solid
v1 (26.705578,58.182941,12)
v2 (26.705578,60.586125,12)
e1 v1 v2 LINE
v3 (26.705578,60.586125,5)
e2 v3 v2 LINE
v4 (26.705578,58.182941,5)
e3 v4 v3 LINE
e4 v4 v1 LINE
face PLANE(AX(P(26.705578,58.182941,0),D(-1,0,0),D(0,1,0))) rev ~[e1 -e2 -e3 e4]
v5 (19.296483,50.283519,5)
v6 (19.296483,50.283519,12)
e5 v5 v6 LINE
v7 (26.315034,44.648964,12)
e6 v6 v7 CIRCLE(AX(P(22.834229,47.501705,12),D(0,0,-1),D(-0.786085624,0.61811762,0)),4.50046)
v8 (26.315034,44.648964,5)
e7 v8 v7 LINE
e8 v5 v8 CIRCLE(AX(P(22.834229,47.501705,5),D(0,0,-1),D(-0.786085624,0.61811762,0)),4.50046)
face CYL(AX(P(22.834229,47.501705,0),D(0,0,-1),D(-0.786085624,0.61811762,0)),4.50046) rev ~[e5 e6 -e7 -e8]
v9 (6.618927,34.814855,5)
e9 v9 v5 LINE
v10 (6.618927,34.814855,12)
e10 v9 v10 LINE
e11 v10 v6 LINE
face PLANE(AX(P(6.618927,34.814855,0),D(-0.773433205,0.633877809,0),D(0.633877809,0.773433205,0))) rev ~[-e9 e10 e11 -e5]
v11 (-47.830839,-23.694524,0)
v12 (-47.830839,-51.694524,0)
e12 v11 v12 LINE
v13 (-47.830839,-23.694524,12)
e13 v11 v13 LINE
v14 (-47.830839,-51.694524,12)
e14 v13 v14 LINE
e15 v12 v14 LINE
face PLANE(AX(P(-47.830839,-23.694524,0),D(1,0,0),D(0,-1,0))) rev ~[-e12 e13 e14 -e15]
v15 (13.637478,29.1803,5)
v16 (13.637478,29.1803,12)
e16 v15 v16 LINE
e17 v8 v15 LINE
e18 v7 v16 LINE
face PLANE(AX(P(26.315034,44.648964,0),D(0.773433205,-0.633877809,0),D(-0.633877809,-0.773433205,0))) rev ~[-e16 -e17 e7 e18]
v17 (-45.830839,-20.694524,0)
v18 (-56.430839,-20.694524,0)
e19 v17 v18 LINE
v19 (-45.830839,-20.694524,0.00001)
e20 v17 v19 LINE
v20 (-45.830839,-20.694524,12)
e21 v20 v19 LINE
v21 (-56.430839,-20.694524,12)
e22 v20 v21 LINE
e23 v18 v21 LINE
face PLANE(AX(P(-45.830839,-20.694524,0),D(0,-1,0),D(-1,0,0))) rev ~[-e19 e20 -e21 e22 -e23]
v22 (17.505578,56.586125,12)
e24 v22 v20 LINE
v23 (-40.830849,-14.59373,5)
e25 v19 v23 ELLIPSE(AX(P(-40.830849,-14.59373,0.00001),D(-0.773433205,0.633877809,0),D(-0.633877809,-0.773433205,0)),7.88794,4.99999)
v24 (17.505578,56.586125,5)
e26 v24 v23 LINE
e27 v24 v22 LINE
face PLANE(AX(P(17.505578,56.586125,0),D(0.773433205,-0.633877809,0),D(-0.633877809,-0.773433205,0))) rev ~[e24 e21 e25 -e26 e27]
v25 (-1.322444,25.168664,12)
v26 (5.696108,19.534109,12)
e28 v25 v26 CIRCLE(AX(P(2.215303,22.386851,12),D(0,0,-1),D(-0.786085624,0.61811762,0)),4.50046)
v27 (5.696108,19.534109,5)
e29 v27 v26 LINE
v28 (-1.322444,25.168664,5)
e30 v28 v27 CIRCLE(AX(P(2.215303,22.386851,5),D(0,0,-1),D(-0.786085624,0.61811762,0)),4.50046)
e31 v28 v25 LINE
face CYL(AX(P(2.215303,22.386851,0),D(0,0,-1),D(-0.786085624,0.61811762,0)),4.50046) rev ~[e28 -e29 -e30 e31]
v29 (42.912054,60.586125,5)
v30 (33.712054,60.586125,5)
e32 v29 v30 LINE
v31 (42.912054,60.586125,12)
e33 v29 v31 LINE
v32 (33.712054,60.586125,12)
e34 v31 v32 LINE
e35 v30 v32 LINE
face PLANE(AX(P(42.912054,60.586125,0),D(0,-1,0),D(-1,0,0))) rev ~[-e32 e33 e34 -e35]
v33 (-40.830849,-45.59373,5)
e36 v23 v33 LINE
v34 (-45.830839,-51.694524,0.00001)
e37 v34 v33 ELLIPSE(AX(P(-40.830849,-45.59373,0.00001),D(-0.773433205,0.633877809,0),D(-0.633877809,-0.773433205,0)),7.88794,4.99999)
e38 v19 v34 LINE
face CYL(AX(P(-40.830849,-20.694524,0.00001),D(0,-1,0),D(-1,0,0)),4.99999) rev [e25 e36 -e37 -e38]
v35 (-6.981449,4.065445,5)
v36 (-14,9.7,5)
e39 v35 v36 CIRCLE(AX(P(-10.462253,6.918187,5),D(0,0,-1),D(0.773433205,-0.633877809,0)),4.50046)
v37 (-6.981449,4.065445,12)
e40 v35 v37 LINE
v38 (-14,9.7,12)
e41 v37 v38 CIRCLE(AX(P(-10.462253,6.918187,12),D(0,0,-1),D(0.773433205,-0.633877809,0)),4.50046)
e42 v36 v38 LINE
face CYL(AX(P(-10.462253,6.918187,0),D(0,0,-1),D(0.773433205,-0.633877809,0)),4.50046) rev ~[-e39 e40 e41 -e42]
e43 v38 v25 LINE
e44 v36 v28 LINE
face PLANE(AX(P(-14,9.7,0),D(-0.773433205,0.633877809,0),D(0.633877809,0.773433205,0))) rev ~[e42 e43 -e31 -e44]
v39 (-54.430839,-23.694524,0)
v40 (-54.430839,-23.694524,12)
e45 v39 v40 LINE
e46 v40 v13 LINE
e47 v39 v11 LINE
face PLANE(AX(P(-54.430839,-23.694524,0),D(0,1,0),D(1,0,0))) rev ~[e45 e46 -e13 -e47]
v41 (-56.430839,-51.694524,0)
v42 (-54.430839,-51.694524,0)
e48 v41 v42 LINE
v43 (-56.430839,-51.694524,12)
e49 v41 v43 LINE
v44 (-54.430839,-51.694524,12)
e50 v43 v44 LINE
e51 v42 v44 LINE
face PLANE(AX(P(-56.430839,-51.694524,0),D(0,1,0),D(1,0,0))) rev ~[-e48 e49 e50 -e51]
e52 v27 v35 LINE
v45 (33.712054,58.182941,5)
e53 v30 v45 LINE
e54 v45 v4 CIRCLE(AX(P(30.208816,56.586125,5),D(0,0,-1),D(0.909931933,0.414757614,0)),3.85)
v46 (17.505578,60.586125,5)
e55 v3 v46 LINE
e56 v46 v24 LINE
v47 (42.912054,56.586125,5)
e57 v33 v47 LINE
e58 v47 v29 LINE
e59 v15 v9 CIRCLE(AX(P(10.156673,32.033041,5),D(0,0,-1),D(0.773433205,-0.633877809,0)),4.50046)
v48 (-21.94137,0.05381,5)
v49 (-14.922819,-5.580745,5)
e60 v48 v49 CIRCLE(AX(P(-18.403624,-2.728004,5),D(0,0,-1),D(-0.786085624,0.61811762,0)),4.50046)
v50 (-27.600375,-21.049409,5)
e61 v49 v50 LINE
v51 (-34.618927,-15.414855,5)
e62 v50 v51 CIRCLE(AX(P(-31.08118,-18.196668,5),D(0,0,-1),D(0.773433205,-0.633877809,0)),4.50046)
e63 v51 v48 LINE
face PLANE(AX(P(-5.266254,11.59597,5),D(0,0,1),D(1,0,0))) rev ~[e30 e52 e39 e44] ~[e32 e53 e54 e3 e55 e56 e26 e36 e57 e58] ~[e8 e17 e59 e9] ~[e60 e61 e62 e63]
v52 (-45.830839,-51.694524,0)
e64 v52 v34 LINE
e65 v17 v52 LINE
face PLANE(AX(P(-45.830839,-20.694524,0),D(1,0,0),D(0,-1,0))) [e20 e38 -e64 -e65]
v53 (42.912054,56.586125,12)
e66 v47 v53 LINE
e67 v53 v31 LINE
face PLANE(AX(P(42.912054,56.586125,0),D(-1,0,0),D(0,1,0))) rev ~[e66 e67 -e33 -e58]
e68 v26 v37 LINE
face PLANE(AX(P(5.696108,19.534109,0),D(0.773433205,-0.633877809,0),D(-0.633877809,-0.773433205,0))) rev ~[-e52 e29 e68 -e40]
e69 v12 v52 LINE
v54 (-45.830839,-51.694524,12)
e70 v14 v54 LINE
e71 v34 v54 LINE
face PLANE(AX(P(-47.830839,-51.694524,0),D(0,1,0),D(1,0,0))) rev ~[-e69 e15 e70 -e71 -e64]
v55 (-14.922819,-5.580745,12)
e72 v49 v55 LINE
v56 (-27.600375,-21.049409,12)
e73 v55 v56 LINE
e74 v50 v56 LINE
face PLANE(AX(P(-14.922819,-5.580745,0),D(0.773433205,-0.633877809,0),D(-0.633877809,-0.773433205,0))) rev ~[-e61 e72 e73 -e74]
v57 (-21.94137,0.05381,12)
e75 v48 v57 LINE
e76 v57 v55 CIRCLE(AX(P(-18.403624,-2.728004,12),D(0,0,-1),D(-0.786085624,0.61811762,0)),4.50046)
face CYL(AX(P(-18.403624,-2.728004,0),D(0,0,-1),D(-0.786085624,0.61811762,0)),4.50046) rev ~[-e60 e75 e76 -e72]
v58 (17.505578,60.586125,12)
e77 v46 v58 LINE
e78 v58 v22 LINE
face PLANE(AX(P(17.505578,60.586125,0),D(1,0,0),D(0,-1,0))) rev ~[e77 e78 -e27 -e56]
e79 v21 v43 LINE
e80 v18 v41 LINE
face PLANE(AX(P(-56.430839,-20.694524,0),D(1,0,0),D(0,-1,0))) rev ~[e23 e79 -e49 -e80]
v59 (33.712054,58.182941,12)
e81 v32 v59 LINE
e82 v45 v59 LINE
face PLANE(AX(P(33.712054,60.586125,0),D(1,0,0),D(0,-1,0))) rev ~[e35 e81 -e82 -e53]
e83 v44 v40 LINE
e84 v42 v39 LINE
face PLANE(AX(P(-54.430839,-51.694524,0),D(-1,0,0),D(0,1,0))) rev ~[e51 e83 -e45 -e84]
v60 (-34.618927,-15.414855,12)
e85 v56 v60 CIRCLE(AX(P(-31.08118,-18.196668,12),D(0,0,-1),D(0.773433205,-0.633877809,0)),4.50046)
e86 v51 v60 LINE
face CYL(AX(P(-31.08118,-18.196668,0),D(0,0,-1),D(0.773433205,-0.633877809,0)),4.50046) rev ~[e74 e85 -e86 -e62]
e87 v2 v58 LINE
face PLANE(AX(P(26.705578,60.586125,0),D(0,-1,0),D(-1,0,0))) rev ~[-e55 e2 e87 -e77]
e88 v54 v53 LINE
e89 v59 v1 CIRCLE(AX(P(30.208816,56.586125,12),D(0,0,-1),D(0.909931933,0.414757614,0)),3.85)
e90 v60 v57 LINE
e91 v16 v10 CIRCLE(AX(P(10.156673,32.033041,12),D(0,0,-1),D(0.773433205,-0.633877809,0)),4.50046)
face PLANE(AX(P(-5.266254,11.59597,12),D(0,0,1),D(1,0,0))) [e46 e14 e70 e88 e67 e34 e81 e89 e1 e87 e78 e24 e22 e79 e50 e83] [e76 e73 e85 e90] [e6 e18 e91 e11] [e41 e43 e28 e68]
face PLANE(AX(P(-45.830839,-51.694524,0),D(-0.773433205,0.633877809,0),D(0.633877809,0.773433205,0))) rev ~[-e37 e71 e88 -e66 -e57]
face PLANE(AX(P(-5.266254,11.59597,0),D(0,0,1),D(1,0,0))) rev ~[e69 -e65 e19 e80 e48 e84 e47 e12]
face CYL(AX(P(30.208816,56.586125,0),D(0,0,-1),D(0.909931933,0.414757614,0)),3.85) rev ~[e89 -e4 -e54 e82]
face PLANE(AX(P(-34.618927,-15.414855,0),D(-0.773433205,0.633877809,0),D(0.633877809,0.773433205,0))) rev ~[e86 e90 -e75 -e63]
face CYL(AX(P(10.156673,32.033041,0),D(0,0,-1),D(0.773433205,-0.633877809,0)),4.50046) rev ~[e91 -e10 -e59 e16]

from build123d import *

# Parameters (mm, degrees)
F1_DEPTH = 12
F2_DEPTH = 25
F3_DEPTH = 5
F4_R     = 4.99999


# Not quite as in the source:
# - a fillet or chamfer is up to 0.001 mm smaller than in the source, because OpenCascade refuses the exact size


with BuildPart() as f1:
    # F0 (on Top) → F1 (new body)
    with BuildSketch(Plane.XY):
        with BuildLine():
            Line((-45.8308390021, -20.6945241443), (-45.8308390021, -51.6945241443))
            Line((-45.8308390021, -51.6945241443), (42.9120542584, 56.586124615))
            Line((42.9120542584, 56.586124615), (42.9120542584, 60.586124615))
            Line((42.9120542584, 60.586124615), (33.7120542584, 60.586124615))
            Line((33.7120542584, 60.586124615), (33.7120542584, 58.1829414275))
            ThreePointArc((33.7120542584, 58.1829414275), (30.2088163179, 52.736124615), (26.7055783775, 58.1829414275))
            Line((26.7055783775, 58.1829414275), (26.7055783775, 60.586124615))
            Line((26.7055783775, 60.586124615), (17.5055783775, 60.586124615))
            Line((17.5055783775, 60.586124615), (17.5055783775, 56.586124615))
            Line((17.5055783775, 56.586124615), (-45.8308390021, -20.6945241443))
        make_face()
        with BuildLine():
            ThreePointArc((-27.6003750582, -21.0494093167), (-33.898601194, -21.7061227773), (-34.6189265027, -15.4148545048))
            Line((-34.6189265027, -15.4148545048), (-21.9413703226, 0.0538096037))
            ThreePointArc((-21.9413703226, 0.0538096037), (-15.5862024886, 0.7814511592), (-14.9228188782, -5.5807452082))
            Line((-14.9228188782, -5.5807452082), (-27.6003750582, -21.0494093167))
        make_face(mode=Mode.SUBTRACT)
        with BuildLine():
            ThreePointArc((-6.9814485555, 4.0654451881), (-13.2796746913, 3.4087317275), (-14, 9.7))
            Line((-14, 9.7), (-1.3224438199, 25.1686641085))
            ThreePointArc((-1.3224438199, 25.1686641085), (5.0327240141, 25.896305664), (5.6961076246, 19.5341092966))
            Line((5.6961076246, 19.5341092966), (-6.9814485555, 4.0654451881))
        make_face(mode=Mode.SUBTRACT)
        with BuildLine():
            ThreePointArc((13.6374779472, 29.1802996929), (7.3392518114, 28.5235862323), (6.6189265027, 34.8148545048))
            Line((6.6189265027, 34.8148545048), (19.2964826828, 50.2835186133))
            ThreePointArc((19.2964826828, 50.2835186133), (25.6516505168, 51.0111601688), (26.3150341273, 44.6489638014))
            Line((26.3150341273, 44.6489638014), (13.6374779472, 29.1802996929))
        make_face(mode=Mode.SUBTRACT)
        Polygon((-54.4308390021, -51.6945241443), (-54.4308390021, -23.6945241443), (-47.8308390021, -23.6945241443), (-47.8308390021, -51.6945241443), (-45.8308390021, -51.6945241443), (-45.8308390021, -20.6945241443), (-56.4308390021, -20.6945241443), (-56.4308390021, -51.6945241443), align=None)
    extrude(amount=F1_DEPTH)

    # F0 (on Top) → F2 (cut)
    with BuildSketch(Plane.XY):
        with BuildLine():
            Line((-21.9413703226, 0.0538096037), (-34.6189265027, -15.4148545048))
            ThreePointArc((-34.6189265027, -15.4148545048), (-33.898601194, -21.7061227773), (-27.6003750582, -21.0494093167))
            Line((-27.6003750582, -21.0494093167), (-14.9228188782, -5.5807452082))
            ThreePointArc((-14.9228188782, -5.5807452082), (-15.5862024886, 0.7814511592), (-21.9413703226, 0.0538096037))
        make_face()
        with BuildLine():
            Line((-1.3224438199, 25.1686641085), (-14, 9.7))
            ThreePointArc((-14, 9.7), (-13.2796746913, 3.4087317275), (-6.9814485555, 4.0654451881))
            Line((-6.9814485555, 4.0654451881), (5.6961076246, 19.5341092966))
            ThreePointArc((5.6961076246, 19.5341092966), (5.0327240141, 25.896305664), (-1.3224438199, 25.1686641085))
        make_face()
        with BuildLine():
            Line((19.2964826828, 50.2835186133), (6.6189265027, 34.8148545048))
            ThreePointArc((6.6189265027, 34.8148545048), (7.3392518114, 28.5235862323), (13.6374779472, 29.1802996929))
            Line((13.6374779472, 29.1802996929), (26.3150341273, 44.6489638014))
            ThreePointArc((26.3150341273, 44.6489638014), (25.6516505168, 51.0111601688), (19.2964826828, 50.2835186133))
        make_face()
    extrude(amount=-F2_DEPTH, mode=Mode.SUBTRACT)

    # F0 (on Top) → F3 (cut)
    with BuildSketch(Plane.XY):
        with BuildLine():
            Line((-45.8308390021, -20.6945241443), (-45.8308390021, -51.6945241443))
            Line((-45.8308390021, -51.6945241443), (42.9120542584, 56.586124615))
            Line((42.9120542584, 56.586124615), (42.9120542584, 60.586124615))
            Line((42.9120542584, 60.586124615), (33.7120542584, 60.586124615))
            Line((33.7120542584, 60.586124615), (33.7120542584, 58.1829414275))
            ThreePointArc((33.7120542584, 58.1829414275), (30.2088163179, 52.736124615), (26.7055783775, 58.1829414275))
            Line((26.7055783775, 58.1829414275), (26.7055783775, 60.586124615))
            Line((26.7055783775, 60.586124615), (17.5055783775, 60.586124615))
            Line((17.5055783775, 60.586124615), (17.5055783775, 56.586124615))
            Line((17.5055783775, 56.586124615), (-45.8308390021, -20.6945241443))
        make_face()
        with BuildLine():
            ThreePointArc((-27.6003750582, -21.0494093167), (-33.898601194, -21.7061227773), (-34.6189265027, -15.4148545048))
            Line((-34.6189265027, -15.4148545048), (-21.9413703226, 0.0538096037))
            ThreePointArc((-21.9413703226, 0.0538096037), (-15.5862024886, 0.7814511592), (-14.9228188782, -5.5807452082))
            Line((-14.9228188782, -5.5807452082), (-27.6003750582, -21.0494093167))
        make_face(mode=Mode.SUBTRACT)
        with BuildLine():
            ThreePointArc((-6.9814485555, 4.0654451881), (-13.2796746913, 3.4087317275), (-14, 9.7))
            Line((-14, 9.7), (-1.3224438199, 25.1686641085))
            ThreePointArc((-1.3224438199, 25.1686641085), (5.0327240141, 25.896305664), (5.6961076246, 19.5341092966))
            Line((5.6961076246, 19.5341092966), (-6.9814485555, 4.0654451881))
        make_face(mode=Mode.SUBTRACT)
        with BuildLine():
            ThreePointArc((13.6374779472, 29.1802996929), (7.3392518114, 28.5235862323), (6.6189265027, 34.8148545048))
            Line((6.6189265027, 34.8148545048), (19.2964826828, 50.2835186133))
            ThreePointArc((19.2964826828, 50.2835186133), (25.6516505168, 51.0111601688), (26.3150341273, 44.6489638014))
            Line((26.3150341273, 44.6489638014), (13.6374779472, 29.1802996929))
        make_face(mode=Mode.SUBTRACT)
    extrude(amount=F3_DEPTH, mode=Mode.SUBTRACT)

    # F4 (radius 5 in the source; OpenCascade refuses exactly that, so slightly less here)
    f4_edges = [f1.edges().sort_by_distance(p)[0] for p in [
        (-45.830839, -36.194524, 5),
    ]]
    fillet(f4_edges, radius=F4_R)


solid = f1.part
